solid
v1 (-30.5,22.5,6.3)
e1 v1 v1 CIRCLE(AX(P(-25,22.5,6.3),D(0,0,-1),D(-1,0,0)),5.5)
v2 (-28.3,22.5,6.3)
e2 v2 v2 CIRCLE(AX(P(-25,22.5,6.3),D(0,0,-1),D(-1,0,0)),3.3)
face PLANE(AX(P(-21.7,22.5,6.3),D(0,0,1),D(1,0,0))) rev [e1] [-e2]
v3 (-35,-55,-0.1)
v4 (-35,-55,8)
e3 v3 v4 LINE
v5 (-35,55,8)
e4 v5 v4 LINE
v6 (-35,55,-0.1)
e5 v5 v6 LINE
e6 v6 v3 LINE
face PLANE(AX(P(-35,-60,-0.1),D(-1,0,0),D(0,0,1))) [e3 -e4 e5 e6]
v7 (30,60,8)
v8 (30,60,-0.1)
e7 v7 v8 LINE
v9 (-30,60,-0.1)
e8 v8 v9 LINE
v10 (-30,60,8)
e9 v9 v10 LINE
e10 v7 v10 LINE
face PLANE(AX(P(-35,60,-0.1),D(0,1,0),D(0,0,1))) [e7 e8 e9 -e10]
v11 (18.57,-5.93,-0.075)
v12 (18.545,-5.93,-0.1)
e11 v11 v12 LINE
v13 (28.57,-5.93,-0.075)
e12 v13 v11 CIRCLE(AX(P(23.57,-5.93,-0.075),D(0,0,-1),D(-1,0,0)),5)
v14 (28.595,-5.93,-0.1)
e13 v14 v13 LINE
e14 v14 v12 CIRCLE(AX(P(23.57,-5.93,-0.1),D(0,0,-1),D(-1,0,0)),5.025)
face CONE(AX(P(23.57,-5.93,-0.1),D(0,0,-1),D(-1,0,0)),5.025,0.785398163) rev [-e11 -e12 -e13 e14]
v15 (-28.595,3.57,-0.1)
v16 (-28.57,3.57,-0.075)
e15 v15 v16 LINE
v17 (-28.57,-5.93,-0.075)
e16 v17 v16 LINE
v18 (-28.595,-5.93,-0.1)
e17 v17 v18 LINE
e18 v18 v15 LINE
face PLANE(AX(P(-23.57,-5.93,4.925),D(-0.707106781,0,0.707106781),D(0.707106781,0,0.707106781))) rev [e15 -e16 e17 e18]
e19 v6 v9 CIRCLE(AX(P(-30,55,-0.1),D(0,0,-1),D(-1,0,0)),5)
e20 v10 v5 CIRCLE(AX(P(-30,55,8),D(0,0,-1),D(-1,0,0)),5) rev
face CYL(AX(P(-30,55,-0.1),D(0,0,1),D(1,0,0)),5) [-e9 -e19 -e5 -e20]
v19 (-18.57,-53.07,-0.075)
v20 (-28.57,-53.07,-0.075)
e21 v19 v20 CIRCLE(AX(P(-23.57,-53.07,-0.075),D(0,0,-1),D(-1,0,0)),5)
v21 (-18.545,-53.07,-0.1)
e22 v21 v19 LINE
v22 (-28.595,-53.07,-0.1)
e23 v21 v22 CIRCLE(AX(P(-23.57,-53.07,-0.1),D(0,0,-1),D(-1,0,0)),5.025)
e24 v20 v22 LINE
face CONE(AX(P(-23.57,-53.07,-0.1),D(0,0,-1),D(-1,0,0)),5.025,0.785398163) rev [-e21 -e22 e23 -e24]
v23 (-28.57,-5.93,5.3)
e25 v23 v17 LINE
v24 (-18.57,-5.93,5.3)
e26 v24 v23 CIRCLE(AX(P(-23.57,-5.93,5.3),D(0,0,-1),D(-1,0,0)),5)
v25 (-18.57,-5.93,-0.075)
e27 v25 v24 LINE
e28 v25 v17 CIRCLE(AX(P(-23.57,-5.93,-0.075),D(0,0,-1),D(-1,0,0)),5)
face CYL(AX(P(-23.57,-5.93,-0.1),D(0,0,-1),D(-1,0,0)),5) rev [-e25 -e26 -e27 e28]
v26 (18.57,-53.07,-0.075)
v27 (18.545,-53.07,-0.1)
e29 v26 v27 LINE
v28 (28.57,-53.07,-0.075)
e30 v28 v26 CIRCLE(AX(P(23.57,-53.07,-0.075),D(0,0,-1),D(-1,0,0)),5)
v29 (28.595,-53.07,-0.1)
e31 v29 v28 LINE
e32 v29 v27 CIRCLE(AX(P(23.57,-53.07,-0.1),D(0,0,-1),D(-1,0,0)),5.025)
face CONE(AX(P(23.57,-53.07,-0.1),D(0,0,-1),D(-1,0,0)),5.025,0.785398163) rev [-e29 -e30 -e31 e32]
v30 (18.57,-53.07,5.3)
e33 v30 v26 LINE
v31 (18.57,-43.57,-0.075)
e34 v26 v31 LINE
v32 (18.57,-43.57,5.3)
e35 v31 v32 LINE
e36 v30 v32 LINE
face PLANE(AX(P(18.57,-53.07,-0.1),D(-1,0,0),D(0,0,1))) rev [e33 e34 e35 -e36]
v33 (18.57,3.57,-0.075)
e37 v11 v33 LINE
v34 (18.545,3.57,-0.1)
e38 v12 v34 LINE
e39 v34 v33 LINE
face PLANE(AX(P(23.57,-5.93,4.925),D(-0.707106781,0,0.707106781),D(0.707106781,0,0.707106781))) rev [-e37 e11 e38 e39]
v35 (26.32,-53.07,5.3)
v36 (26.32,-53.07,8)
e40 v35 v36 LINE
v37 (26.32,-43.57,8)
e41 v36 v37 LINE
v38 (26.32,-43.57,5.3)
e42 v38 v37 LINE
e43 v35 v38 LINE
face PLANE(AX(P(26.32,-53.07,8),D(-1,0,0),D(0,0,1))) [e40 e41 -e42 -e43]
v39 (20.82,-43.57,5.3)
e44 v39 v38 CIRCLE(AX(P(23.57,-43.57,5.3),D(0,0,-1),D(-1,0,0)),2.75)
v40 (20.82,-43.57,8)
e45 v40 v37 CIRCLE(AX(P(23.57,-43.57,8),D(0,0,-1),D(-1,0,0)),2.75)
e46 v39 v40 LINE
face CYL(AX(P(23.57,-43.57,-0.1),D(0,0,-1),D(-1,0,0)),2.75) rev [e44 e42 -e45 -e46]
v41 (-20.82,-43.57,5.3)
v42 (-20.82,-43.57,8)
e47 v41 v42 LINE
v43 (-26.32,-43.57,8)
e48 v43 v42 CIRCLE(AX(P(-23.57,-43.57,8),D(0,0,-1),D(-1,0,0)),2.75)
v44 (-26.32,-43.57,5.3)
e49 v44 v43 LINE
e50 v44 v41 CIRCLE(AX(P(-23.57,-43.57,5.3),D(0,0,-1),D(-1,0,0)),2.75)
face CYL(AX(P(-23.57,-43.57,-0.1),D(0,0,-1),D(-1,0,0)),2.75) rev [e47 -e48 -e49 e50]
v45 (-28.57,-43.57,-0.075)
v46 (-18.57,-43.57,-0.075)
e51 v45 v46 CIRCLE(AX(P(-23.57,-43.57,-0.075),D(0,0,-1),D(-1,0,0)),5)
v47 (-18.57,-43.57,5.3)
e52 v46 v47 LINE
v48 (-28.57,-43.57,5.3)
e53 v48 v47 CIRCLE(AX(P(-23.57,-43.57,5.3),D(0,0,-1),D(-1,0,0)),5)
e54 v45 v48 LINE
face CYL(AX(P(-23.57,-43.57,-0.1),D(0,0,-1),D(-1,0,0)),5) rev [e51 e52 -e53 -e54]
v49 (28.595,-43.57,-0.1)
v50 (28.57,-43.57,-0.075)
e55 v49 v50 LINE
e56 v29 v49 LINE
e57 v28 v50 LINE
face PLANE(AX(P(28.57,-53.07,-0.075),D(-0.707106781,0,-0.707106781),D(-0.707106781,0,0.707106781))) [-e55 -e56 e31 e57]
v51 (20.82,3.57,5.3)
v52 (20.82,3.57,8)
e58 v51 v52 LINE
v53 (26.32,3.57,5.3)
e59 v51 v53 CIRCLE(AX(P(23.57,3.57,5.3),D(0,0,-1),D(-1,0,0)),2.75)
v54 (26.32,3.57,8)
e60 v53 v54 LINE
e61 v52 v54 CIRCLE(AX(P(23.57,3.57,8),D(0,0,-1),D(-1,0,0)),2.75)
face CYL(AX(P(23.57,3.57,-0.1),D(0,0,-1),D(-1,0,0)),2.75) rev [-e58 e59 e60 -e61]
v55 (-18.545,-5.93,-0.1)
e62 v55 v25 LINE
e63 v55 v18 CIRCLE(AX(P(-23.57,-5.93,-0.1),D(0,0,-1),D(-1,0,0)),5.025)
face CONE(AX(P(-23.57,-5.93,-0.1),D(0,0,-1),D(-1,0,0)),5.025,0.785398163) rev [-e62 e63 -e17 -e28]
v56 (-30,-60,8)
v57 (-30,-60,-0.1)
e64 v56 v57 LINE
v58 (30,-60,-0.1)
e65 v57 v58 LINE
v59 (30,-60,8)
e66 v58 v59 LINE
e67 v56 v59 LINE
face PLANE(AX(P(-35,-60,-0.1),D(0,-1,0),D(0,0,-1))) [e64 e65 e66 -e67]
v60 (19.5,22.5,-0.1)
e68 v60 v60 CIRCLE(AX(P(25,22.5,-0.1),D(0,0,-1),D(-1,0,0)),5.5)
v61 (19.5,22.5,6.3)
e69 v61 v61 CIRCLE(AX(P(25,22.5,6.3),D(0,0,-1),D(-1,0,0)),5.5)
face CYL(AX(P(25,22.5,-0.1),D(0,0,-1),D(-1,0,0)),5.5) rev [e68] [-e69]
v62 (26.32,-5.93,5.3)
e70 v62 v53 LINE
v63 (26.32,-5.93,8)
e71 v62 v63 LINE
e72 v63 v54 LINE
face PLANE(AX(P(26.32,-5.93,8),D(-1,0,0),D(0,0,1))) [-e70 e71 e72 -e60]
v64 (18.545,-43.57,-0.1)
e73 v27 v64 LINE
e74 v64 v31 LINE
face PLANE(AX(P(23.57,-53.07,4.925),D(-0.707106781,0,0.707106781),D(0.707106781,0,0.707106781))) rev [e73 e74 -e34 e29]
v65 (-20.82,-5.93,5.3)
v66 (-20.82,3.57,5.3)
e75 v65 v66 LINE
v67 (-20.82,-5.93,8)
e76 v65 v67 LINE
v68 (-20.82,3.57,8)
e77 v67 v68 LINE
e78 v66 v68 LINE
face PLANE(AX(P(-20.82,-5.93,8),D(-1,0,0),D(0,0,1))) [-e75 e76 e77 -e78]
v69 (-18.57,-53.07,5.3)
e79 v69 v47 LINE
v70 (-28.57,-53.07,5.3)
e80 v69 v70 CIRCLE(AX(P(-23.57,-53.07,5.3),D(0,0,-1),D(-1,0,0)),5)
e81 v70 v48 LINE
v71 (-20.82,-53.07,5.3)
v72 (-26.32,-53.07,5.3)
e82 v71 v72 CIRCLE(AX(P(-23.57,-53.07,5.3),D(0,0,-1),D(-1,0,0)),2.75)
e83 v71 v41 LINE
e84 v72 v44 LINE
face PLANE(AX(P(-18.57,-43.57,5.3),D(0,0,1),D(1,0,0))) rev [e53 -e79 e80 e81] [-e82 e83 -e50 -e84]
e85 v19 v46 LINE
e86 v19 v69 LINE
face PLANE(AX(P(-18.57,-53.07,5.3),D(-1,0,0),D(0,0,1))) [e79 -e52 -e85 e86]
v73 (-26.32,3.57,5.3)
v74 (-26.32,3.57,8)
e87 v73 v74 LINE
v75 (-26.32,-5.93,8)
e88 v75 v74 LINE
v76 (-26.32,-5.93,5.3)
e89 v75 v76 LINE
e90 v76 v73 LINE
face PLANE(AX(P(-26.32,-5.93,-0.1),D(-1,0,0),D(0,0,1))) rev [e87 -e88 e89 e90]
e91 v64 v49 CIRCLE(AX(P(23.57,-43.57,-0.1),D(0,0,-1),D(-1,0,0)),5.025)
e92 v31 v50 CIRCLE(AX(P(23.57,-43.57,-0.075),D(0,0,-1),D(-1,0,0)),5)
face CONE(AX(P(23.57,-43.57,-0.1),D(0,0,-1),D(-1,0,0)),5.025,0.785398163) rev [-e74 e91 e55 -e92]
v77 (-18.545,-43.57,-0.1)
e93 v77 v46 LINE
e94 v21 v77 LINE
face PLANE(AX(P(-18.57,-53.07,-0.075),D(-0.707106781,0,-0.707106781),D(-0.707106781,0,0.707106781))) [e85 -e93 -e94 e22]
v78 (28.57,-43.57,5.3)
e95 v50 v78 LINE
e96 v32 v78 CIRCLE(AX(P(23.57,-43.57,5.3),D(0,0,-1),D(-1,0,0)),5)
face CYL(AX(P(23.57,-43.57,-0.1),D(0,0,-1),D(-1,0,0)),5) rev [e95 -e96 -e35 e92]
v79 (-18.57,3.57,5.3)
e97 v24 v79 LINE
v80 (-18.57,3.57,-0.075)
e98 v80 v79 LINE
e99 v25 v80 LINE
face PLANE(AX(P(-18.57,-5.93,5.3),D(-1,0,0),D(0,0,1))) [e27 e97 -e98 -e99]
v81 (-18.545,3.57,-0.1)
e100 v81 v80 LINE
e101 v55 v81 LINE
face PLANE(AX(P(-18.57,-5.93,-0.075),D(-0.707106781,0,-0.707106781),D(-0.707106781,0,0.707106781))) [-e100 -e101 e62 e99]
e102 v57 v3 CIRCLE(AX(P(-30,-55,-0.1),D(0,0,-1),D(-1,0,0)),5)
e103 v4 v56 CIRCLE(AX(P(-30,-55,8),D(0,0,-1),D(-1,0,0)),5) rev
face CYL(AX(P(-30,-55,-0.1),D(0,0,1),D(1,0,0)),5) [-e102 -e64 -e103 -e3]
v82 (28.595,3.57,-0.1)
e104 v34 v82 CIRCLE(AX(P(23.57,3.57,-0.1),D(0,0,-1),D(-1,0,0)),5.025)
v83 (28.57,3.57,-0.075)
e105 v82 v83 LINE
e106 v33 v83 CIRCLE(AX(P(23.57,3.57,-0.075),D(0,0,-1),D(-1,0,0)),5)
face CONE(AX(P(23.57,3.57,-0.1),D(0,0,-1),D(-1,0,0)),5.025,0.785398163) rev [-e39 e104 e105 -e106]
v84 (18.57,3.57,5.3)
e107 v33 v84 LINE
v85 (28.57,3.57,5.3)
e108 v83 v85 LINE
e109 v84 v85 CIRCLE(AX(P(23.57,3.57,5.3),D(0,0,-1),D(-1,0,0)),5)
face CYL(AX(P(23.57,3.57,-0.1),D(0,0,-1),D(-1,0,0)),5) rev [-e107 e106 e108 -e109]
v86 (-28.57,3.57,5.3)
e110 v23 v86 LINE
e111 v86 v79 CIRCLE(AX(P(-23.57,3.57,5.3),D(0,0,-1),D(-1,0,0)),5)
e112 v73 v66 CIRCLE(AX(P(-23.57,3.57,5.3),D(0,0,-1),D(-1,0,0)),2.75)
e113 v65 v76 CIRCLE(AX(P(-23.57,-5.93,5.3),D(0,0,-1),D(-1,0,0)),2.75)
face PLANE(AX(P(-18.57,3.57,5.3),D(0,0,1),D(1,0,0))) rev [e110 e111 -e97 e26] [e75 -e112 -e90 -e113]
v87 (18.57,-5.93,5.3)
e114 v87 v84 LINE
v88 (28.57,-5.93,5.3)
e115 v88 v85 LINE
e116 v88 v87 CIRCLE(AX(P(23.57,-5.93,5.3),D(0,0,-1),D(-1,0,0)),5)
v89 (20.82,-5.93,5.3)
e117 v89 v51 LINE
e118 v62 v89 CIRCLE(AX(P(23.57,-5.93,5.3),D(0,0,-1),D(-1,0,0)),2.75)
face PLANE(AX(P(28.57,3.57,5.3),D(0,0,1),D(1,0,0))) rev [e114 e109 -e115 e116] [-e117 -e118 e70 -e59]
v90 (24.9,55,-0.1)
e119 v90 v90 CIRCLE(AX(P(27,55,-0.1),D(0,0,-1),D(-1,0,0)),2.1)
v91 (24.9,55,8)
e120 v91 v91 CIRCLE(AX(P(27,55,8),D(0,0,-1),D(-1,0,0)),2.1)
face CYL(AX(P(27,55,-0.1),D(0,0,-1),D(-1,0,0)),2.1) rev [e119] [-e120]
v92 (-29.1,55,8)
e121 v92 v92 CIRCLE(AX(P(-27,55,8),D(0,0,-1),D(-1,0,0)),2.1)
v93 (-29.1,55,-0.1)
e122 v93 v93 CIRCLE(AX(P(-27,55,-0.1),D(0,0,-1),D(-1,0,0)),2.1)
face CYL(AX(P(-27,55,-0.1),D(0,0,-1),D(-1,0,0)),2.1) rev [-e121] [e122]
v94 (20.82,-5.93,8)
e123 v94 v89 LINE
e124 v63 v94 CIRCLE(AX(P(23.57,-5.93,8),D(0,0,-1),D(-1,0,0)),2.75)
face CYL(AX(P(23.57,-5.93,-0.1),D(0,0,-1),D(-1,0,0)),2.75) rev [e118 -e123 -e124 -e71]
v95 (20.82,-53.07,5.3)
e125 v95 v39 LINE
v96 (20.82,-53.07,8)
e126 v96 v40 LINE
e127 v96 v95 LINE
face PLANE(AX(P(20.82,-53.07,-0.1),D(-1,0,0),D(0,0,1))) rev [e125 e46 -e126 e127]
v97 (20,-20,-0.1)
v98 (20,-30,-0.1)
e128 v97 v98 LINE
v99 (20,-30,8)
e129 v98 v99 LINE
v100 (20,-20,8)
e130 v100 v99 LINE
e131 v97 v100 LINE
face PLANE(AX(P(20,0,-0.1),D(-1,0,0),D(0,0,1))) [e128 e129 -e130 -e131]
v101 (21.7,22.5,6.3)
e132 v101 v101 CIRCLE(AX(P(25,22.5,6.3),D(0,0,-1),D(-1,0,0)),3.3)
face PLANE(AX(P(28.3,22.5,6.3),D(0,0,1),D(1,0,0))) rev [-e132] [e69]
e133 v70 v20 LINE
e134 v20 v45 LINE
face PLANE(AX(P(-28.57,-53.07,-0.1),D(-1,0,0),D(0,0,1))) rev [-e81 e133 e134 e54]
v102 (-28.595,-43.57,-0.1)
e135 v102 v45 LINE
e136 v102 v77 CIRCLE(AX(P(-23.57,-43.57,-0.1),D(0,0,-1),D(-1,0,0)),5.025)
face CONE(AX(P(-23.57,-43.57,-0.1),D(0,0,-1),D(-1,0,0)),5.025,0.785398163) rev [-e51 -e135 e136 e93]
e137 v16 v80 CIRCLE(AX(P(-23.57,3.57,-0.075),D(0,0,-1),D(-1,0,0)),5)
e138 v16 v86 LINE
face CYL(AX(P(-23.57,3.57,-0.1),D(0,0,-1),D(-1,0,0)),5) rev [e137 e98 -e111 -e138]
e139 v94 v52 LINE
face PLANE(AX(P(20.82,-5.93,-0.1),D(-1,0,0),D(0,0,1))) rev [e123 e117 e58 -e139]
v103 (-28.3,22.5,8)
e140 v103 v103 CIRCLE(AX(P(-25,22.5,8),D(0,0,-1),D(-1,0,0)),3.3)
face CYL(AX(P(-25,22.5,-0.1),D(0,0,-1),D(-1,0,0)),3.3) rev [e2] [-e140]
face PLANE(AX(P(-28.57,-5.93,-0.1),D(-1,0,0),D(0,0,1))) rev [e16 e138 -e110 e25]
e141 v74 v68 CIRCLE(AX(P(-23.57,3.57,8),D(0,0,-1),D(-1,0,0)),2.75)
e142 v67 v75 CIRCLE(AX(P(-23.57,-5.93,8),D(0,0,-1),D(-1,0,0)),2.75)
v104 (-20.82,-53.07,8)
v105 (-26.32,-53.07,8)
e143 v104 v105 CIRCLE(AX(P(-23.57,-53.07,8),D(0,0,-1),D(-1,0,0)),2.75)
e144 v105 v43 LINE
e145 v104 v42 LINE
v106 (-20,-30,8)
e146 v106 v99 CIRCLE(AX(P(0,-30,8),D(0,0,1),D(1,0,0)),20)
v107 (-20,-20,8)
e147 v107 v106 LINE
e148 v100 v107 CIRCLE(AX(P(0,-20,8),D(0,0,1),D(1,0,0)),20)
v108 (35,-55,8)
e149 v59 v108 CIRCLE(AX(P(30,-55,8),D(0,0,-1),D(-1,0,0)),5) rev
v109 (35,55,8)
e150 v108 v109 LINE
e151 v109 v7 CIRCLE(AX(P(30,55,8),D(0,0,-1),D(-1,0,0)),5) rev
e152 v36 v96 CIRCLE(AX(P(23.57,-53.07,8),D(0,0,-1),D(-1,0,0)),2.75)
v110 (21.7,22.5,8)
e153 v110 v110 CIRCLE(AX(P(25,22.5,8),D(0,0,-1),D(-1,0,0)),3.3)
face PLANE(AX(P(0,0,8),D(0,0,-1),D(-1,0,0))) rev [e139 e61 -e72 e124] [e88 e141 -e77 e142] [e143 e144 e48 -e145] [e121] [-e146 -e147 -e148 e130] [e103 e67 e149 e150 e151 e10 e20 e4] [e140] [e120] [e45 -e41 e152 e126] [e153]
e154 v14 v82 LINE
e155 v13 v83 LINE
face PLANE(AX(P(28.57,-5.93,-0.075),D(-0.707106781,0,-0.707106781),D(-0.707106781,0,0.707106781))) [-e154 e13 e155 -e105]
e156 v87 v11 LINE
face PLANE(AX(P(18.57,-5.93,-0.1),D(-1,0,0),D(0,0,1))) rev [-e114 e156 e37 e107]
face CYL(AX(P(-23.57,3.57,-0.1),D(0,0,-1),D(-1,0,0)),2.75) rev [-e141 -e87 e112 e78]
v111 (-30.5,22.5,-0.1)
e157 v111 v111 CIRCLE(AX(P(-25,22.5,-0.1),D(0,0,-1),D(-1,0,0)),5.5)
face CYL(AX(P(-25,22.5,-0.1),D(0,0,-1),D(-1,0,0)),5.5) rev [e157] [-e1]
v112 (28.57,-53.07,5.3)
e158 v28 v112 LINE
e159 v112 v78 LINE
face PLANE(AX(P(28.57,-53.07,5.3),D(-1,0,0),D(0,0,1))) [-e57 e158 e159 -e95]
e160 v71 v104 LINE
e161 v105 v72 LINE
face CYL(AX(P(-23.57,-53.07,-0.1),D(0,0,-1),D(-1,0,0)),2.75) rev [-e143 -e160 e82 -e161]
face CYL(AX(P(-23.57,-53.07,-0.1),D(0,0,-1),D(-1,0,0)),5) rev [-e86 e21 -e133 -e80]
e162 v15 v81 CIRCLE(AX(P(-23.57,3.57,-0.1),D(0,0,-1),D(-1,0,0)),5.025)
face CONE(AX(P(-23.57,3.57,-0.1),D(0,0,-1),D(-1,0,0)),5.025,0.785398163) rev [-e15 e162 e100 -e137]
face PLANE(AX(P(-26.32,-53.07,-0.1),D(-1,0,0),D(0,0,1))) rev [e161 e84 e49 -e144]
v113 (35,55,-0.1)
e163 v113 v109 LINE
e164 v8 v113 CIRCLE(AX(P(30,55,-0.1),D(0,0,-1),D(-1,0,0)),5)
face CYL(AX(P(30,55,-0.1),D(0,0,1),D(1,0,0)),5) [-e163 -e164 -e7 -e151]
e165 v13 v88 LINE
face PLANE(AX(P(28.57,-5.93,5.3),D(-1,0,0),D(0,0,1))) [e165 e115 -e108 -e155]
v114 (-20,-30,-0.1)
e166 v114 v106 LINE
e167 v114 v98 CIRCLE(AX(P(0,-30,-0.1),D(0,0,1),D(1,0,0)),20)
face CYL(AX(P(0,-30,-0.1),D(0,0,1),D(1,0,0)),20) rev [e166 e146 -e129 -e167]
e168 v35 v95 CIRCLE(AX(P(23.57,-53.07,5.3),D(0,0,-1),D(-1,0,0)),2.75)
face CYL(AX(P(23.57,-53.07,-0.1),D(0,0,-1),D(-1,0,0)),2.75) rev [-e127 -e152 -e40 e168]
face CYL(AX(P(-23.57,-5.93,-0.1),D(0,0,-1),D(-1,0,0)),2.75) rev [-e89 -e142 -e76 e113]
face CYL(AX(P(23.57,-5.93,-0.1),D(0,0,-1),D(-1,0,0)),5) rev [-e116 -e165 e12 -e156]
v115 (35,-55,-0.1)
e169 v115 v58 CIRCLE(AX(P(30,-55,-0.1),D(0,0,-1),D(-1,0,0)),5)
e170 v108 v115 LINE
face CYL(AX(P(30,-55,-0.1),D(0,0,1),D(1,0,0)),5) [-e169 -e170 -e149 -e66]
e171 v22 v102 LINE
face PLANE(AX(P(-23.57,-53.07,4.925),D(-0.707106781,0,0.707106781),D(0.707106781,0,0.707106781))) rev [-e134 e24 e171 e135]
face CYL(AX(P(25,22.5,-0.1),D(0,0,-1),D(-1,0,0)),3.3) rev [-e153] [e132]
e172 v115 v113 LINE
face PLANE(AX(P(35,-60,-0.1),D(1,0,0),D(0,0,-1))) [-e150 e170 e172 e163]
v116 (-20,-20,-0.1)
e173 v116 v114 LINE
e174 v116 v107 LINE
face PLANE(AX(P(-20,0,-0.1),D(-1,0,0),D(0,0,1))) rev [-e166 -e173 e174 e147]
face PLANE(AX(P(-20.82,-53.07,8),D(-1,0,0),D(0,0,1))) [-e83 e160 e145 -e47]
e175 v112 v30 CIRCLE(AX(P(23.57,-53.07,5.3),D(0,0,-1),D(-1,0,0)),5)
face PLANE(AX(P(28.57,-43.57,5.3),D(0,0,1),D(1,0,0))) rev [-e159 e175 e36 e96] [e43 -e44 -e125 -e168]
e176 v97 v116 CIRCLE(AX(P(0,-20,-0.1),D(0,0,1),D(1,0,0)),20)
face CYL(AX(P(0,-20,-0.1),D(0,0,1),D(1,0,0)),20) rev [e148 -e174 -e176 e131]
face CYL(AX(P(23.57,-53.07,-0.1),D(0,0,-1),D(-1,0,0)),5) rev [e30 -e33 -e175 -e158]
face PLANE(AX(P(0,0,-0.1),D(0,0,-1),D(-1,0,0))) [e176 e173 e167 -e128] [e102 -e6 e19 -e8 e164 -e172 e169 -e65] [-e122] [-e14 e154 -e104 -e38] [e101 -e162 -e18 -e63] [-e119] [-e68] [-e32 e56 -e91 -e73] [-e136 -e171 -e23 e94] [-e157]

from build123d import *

# Parameters (mm, degrees)
BOSS_EXTRU_1_DEPTH                                 = 8
BOSS_EXTRU_1_DEPTH_BACK                            = 0.1
ESQUISSE1_W                                        = 70
ESQUISSE1_H                                        = 120
CHAMBRAGE_POUR_VIS_T_TE_HEXAGONALE_M62_D           = 6.6
CHAMBRAGE_POUR_VIS_T_TE_HEXAGONALE_M62_CBORE_D     = 11
CHAMBRAGE_POUR_VIS_T_TE_HEXAGONALE_M62_CBORE_DEPTH = 6.4
ESQUISSE4_R                                        = 20
ENL_V_MAT_EXTRU_1_DEPTH                            = 70.932896408
RAINURE_START                                      = -0.1
RAINURE_DE_CHAMBRAGE_POUR_VIS_T_TE_HEX_DEPTH       = 5.4
RAINURE_START_2                                    = 5.3
RAINURE_DE_CHAMBRAGE_POUR_VIS_T_TE_3_DEPTH         = 3.7
TROU_POUR_TARAUDAGE_POUR_TROU_TARAUD_M5_D          = 4.2
CONG_1_R                                           = 5


with BuildPart() as part:
    # Esquisse1 → Boss.-Extru.1 (new, two sides: drawn at the far end of the back side and taken through both)
    with BuildSketch(Plane.XY.offset(-BOSS_EXTRU_1_DEPTH_BACK)):
        Rectangle(ESQUISSE1_W, ESQUISSE1_H)
    extrude(amount=BOSS_EXTRU_1_DEPTH + BOSS_EXTRU_1_DEPTH_BACK)

    # Chambrage pour vis à tête hexagonale M62 (through all)
    with Locations(Plane(origin=(0, 0, -0.1), x_dir=(-1, 0, 0), z_dir=(0, 0, -1))):
        with Locations((25, 22.5), (-25, 22.5)):
            CounterBoreHole(CHAMBRAGE_POUR_VIS_T_TE_HEXAGONALE_M62_D / 2, CHAMBRAGE_POUR_VIS_T_TE_HEXAGONALE_M62_CBORE_D / 2, CHAMBRAGE_POUR_VIS_T_TE_HEXAGONALE_M62_CBORE_DEPTH)

    # Esquisse4 → Enlèv. mat.-Extru.1 (cut, through all)
    with BuildSketch(Plane.XY.offset(8)):
        with Locations((0, -20)):
            Circle(ESQUISSE4_R)
        with BuildLine():
            Line((20, -30), (20, -20))
            ThreePointArc((20, -20), (0, -40), (-20, -20))
            Line((-20, -20), (-20, -30))
            ThreePointArc((-20, -30), (0, -50), (20, -30))
        make_face()
    extrude(amount=-ENL_V_MAT_EXTRU_1_DEPTH, mode=Mode.SUBTRACT)

    # Rainure de chambrage pour vis à tête hexagonale M53: read off the stored shape, not the designer's step
    # Rainure de chambrage pour vis _ t_te 2 → Rainure de chambrage pour vis à tête hexagonale M53 (cut)
    with BuildSketch(Plane.XY.offset(RAINURE_START)):
        with BuildLine():
            ThreePointArc((-18.57, 3.57), (-23.57, 8.57), (-28.57, 3.57))
            Line((-28.57, 3.57), (-28.57, -5.93))
            ThreePointArc((-28.57, -5.93), (-23.57, -10.93), (-18.57, -5.93))
            Line((-18.57, -5.93), (-18.57, 3.57))
        make_face()
        with BuildLine():
            Line((-18.57, -53.07), (-18.57, -43.57))
            ThreePointArc((-18.57, -43.57), (-23.57, -38.57), (-28.57, -43.57))
            Line((-28.57, -43.57), (-28.57, -53.07))
            ThreePointArc((-28.57, -53.07), (-23.57, -58.07), (-18.57, -53.07))
        make_face()
        with BuildLine():
            ThreePointArc((28.57, -43.57), (23.57, -38.57), (18.57, -43.57))
            Line((18.57, -43.57), (18.57, -53.07))
            ThreePointArc((18.57, -53.07), (23.57, -58.07), (28.57, -53.07))
            Line((28.57, -53.07), (28.57, -43.57))
        make_face()
        with BuildLine():
            Line((28.57, -5.93), (28.57, 3.57))
            ThreePointArc((28.57, 3.57), (23.57, 8.57), (18.57, 3.57))
            Line((18.57, 3.57), (18.57, -5.93))
            ThreePointArc((18.57, -5.93), (23.57, -10.93), (28.57, -5.93))
        make_face()
    extrude(amount=RAINURE_DE_CHAMBRAGE_POUR_VIS_T_TE_HEX_DEPTH, mode=Mode.SUBTRACT)

    # Rainure de chambrage pour vis _ t_te 3 o → Rainure de chambrage pour vis _ t_te 3 (cut)
    with BuildSketch(Plane.XY.offset(RAINURE_START_2)):
        with BuildLine():
            ThreePointArc((-20.82, 3.57), (-23.57, 6.32), (-26.32, 3.57))
            Line((-26.32, 3.57), (-26.32, -5.93))
            ThreePointArc((-26.32, -5.93), (-23.57, -8.68), (-20.82, -5.93))
            Line((-20.82, -5.93), (-20.82, 3.57))
        make_face()
        with BuildLine():
            Line((-20.82, -53.07), (-20.82, -43.57))
            ThreePointArc((-20.82, -43.57), (-23.57, -40.82), (-26.32, -43.57))
            Line((-26.32, -43.57), (-26.32, -53.07))
            ThreePointArc((-26.32, -53.07), (-23.57, -55.82), (-20.82, -53.07))
        make_face()
        with BuildLine():
            ThreePointArc((26.32, -43.57), (23.57, -40.82), (20.82, -43.57))
            Line((20.82, -43.57), (20.82, -53.07))
            ThreePointArc((20.82, -53.07), (23.57, -55.82), (26.32, -53.07))
            Line((26.32, -53.07), (26.32, -43.57))
        make_face()
        with BuildLine():
            Line((26.32, -5.93), (26.32, 3.57))
            ThreePointArc((26.32, 3.57), (23.57, 6.32), (20.82, 3.57))
            Line((20.82, 3.57), (20.82, -5.93))
            ThreePointArc((20.82, -5.93), (23.57, -8.68), (26.32, -5.93))
        make_face()
    extrude(amount=RAINURE_DE_CHAMBRAGE_POUR_VIS_T_TE_3_DEPTH, mode=Mode.SUBTRACT)

    # Rainure de chambrage pour vis _ t_te 4: loft between two sections, ruled curve by curve
    rainure_de_chambrage_pour_vis_t_te_4_from = [
        Edge.make_three_point_arc((-28.57, 3.57, -0.075), (-27.105533906, 7.105533906, -0.075), (-23.57, 8.57, -0.075)),
        Edge.make_three_point_arc((-23.57, 8.57, -0.075), (-20.034466094, 7.105533906, -0.075), (-18.57, 3.57, -0.075)),
        Edge.make_three_point_arc((-18.57, -5.93, -0.075), (-20.034466094, -9.465533906, -0.075), (-23.57, -10.93, -0.075)),
        Edge.make_three_point_arc((-23.57, -10.93, -0.075), (-27.105533906, -9.465533906, -0.075), (-28.57, -5.93, -0.075)),
        Edge.make_line((-18.57, 3.57, -0.075), (-18.57, -5.93, -0.075)),
        Edge.make_line((-28.57, 3.57, -0.075), (-28.57, -5.93, -0.075)),
    ]
    rainure_de_chambrage_pour_vis_t_te_4_to = [
        Edge.make_three_point_arc((-28.595, 3.57, -0.1), (-27.123211575, 7.123211575, -0.1), (-23.57, 8.595, -0.1)),
        Edge.make_three_point_arc((-23.57, 8.595, -0.1), (-20.016788425, 7.123211575, -0.1), (-18.545, 3.57, -0.1)),
        Edge.make_three_point_arc((-18.545, -5.93, -0.1), (-20.016788425, -9.483211575, -0.1), (-23.57, -10.955, -0.1)),
        Edge.make_three_point_arc((-23.57, -10.955, -0.1), (-27.123211575, -9.483211575, -0.1), (-28.595, -5.93, -0.1)),
        Edge.make_line((-18.545, 3.57, -0.1), (-18.545, -5.93, -0.1)),
        Edge.make_line((-28.595, 3.57, -0.1), (-28.595, -5.93, -0.1)),
    ]
    rainure_de_chambrage_pour_vis_t_te_4 = Solid(Shell([*[Face.make_surface_from_curves(rainure_de_chambrage_pour_vis_t_te_4_from[k], rainure_de_chambrage_pour_vis_t_te_4_to[k]) for k in range(6)], Face(Wire(rainure_de_chambrage_pour_vis_t_te_4_from)), Face(Wire(rainure_de_chambrage_pour_vis_t_te_4_to))]))
    add(rainure_de_chambrage_pour_vis_t_te_4, mode=Mode.SUBTRACT)

    # Rainure de chambrage pour vis _ t_te 5: loft between two sections, ruled curve by curve
    rainure_de_chambrage_pour_vis_t_te_5_from = [
        Edge.make_three_point_arc((-28.57, -43.57, -0.075), (-27.105533906, -40.034466094, -0.075), (-23.57, -38.57, -0.075)),
        Edge.make_three_point_arc((-23.57, -38.57, -0.075), (-20.034466094, -40.034466094, -0.075), (-18.57, -43.57, -0.075)),
        Edge.make_three_point_arc((-18.57, -53.07, -0.075), (-20.034466094, -56.605533906, -0.075), (-23.57, -58.07, -0.075)),
        Edge.make_three_point_arc((-23.57, -58.07, -0.075), (-27.105533906, -56.605533906, -0.075), (-28.57, -53.07, -0.075)),
        Edge.make_line((-18.57, -43.57, -0.075), (-18.57, -53.07, -0.075)),
        Edge.make_line((-28.57, -43.57, -0.075), (-28.57, -53.07, -0.075)),
    ]
    rainure_de_chambrage_pour_vis_t_te_5_to = [
        Edge.make_three_point_arc((-28.595, -43.57, -0.1), (-27.123211575, -40.016788425, -0.1), (-23.57, -38.545, -0.1)),
        Edge.make_three_point_arc((-23.57, -38.545, -0.1), (-20.016788425, -40.016788425, -0.1), (-18.545, -43.57, -0.1)),
        Edge.make_three_point_arc((-18.545, -53.07, -0.1), (-20.016788425, -56.623211575, -0.1), (-23.57, -58.095, -0.1)),
        Edge.make_three_point_arc((-23.57, -58.095, -0.1), (-27.123211575, -56.623211575, -0.1), (-28.595, -53.07, -0.1)),
        Edge.make_line((-18.545, -43.57, -0.1), (-18.545, -53.07, -0.1)),
        Edge.make_line((-28.595, -43.57, -0.1), (-28.595, -53.07, -0.1)),
    ]
    rainure_de_chambrage_pour_vis_t_te_5 = Solid(Shell([*[Face.make_surface_from_curves(rainure_de_chambrage_pour_vis_t_te_5_from[k], rainure_de_chambrage_pour_vis_t_te_5_to[k]) for k in range(6)], Face(Wire(rainure_de_chambrage_pour_vis_t_te_5_from)), Face(Wire(rainure_de_chambrage_pour_vis_t_te_5_to))]))
    add(rainure_de_chambrage_pour_vis_t_te_5, mode=Mode.SUBTRACT)

    # Rainure de chambrage pour vis _ t_te 6: loft between two sections, ruled curve by curve
    rainure_de_chambrage_pour_vis_t_te_6_from = [
        Edge.make_three_point_arc((18.57, -43.57, -0.075), (20.034466094, -40.034466094, -0.075), (23.57, -38.57, -0.075)),
        Edge.make_three_point_arc((23.57, -38.57, -0.075), (27.105533906, -40.034466094, -0.075), (28.57, -43.57, -0.075)),
        Edge.make_three_point_arc((28.57, -53.07, -0.075), (27.105533906, -56.605533906, -0.075), (23.57, -58.07, -0.075)),
        Edge.make_three_point_arc((23.57, -58.07, -0.075), (20.034466094, -56.605533906, -0.075), (18.57, -53.07, -0.075)),
        Edge.make_line((28.57, -43.57, -0.075), (28.57, -53.07, -0.075)),
        Edge.make_line((18.57, -43.57, -0.075), (18.57, -53.07, -0.075)),
    ]
    rainure_de_chambrage_pour_vis_t_te_6_to = [
        Edge.make_three_point_arc((18.545, -43.57, -0.1), (20.016788425, -40.016788425, -0.1), (23.57, -38.545, -0.1)),
        Edge.make_three_point_arc((23.57, -38.545, -0.1), (27.123211575, -40.016788425, -0.1), (28.595, -43.57, -0.1)),
        Edge.make_three_point_arc((28.595, -53.07, -0.1), (27.123211575, -56.623211575, -0.1), (23.57, -58.095, -0.1)),
        Edge.make_three_point_arc((23.57, -58.095, -0.1), (20.016788425, -56.623211575, -0.1), (18.545, -53.07, -0.1)),
        Edge.make_line((28.595, -43.57, -0.1), (28.595, -53.07, -0.1)),
        Edge.make_line((18.545, -43.57, -0.1), (18.545, -53.07, -0.1)),
    ]
    rainure_de_chambrage_pour_vis_t_te_6 = Solid(Shell([*[Face.make_surface_from_curves(rainure_de_chambrage_pour_vis_t_te_6_from[k], rainure_de_chambrage_pour_vis_t_te_6_to[k]) for k in range(6)], Face(Wire(rainure_de_chambrage_pour_vis_t_te_6_from)), Face(Wire(rainure_de_chambrage_pour_vis_t_te_6_to))]))
    add(rainure_de_chambrage_pour_vis_t_te_6, mode=Mode.SUBTRACT)

    # Rainure de chambrage pour vis _ t_te 7: loft between two sections, ruled curve by curve
    rainure_de_chambrage_pour_vis_t_te_7_from = [
        Edge.make_three_point_arc((18.57, 3.57, -0.075), (20.034466094, 7.105533906, -0.075), (23.57, 8.57, -0.075)),
        Edge.make_three_point_arc((23.57, 8.57, -0.075), (27.105533906, 7.105533906, -0.075), (28.57, 3.57, -0.075)),
        Edge.make_three_point_arc((28.57, -5.93, -0.075), (27.105533906, -9.465533906, -0.075), (23.57, -10.93, -0.075)),
        Edge.make_three_point_arc((23.57, -10.93, -0.075), (20.034466094, -9.465533906, -0.075), (18.57, -5.93, -0.075)),
        Edge.make_line((28.57, 3.57, -0.075), (28.57, -5.93, -0.075)),
        Edge.make_line((18.57, 3.57, -0.075), (18.57, -5.93, -0.075)),
    ]
    rainure_de_chambrage_pour_vis_t_te_7_to = [
        Edge.make_three_point_arc((18.545, 3.57, -0.1), (20.016788425, 7.123211575, -0.1), (23.57, 8.595, -0.1)),
        Edge.make_three_point_arc((23.57, 8.595, -0.1), (27.123211575, 7.123211575, -0.1), (28.595, 3.57, -0.1)),
        Edge.make_three_point_arc((28.595, -5.93, -0.1), (27.123211575, -9.483211575, -0.1), (23.57, -10.955, -0.1)),
        Edge.make_three_point_arc((23.57, -10.955, -0.1), (20.016788425, -9.483211575, -0.1), (18.545, -5.93, -0.1)),
        Edge.make_line((28.595, 3.57, -0.1), (28.595, -5.93, -0.1)),
        Edge.make_line((18.545, 3.57, -0.1), (18.545, -5.93, -0.1)),
    ]
    rainure_de_chambrage_pour_vis_t_te_7 = Solid(Shell([*[Face.make_surface_from_curves(rainure_de_chambrage_pour_vis_t_te_7_from[k], rainure_de_chambrage_pour_vis_t_te_7_to[k]) for k in range(6)], Face(Wire(rainure_de_chambrage_pour_vis_t_te_7_from)), Face(Wire(rainure_de_chambrage_pour_vis_t_te_7_to))]))
    add(rainure_de_chambrage_pour_vis_t_te_7, mode=Mode.SUBTRACT)

    # Trou pour taraudage pour trou taraudé M51 (through all)
    with Locations(Plane(origin=(0, 0, -0.1), x_dir=(-1, 0, 0), z_dir=(0, 0, -1))):
        with Locations((-27, 55), (27, 55)):
            Hole(TROU_POUR_TARAUDAGE_POUR_TROU_TARAUD_M5_D / 2)

    # Congé1
    cong_1_edges = [part.edges().sort_by_distance(p)[0] for p in [
        (35, -60, 3.95),
        (-35, -60, 3.95),
        (-35, 60, 3.95),
        (35, 60, 3.95),
    ]]
    fillet(cong_1_edges, radius=CONG_1_R)


solid = part.part
